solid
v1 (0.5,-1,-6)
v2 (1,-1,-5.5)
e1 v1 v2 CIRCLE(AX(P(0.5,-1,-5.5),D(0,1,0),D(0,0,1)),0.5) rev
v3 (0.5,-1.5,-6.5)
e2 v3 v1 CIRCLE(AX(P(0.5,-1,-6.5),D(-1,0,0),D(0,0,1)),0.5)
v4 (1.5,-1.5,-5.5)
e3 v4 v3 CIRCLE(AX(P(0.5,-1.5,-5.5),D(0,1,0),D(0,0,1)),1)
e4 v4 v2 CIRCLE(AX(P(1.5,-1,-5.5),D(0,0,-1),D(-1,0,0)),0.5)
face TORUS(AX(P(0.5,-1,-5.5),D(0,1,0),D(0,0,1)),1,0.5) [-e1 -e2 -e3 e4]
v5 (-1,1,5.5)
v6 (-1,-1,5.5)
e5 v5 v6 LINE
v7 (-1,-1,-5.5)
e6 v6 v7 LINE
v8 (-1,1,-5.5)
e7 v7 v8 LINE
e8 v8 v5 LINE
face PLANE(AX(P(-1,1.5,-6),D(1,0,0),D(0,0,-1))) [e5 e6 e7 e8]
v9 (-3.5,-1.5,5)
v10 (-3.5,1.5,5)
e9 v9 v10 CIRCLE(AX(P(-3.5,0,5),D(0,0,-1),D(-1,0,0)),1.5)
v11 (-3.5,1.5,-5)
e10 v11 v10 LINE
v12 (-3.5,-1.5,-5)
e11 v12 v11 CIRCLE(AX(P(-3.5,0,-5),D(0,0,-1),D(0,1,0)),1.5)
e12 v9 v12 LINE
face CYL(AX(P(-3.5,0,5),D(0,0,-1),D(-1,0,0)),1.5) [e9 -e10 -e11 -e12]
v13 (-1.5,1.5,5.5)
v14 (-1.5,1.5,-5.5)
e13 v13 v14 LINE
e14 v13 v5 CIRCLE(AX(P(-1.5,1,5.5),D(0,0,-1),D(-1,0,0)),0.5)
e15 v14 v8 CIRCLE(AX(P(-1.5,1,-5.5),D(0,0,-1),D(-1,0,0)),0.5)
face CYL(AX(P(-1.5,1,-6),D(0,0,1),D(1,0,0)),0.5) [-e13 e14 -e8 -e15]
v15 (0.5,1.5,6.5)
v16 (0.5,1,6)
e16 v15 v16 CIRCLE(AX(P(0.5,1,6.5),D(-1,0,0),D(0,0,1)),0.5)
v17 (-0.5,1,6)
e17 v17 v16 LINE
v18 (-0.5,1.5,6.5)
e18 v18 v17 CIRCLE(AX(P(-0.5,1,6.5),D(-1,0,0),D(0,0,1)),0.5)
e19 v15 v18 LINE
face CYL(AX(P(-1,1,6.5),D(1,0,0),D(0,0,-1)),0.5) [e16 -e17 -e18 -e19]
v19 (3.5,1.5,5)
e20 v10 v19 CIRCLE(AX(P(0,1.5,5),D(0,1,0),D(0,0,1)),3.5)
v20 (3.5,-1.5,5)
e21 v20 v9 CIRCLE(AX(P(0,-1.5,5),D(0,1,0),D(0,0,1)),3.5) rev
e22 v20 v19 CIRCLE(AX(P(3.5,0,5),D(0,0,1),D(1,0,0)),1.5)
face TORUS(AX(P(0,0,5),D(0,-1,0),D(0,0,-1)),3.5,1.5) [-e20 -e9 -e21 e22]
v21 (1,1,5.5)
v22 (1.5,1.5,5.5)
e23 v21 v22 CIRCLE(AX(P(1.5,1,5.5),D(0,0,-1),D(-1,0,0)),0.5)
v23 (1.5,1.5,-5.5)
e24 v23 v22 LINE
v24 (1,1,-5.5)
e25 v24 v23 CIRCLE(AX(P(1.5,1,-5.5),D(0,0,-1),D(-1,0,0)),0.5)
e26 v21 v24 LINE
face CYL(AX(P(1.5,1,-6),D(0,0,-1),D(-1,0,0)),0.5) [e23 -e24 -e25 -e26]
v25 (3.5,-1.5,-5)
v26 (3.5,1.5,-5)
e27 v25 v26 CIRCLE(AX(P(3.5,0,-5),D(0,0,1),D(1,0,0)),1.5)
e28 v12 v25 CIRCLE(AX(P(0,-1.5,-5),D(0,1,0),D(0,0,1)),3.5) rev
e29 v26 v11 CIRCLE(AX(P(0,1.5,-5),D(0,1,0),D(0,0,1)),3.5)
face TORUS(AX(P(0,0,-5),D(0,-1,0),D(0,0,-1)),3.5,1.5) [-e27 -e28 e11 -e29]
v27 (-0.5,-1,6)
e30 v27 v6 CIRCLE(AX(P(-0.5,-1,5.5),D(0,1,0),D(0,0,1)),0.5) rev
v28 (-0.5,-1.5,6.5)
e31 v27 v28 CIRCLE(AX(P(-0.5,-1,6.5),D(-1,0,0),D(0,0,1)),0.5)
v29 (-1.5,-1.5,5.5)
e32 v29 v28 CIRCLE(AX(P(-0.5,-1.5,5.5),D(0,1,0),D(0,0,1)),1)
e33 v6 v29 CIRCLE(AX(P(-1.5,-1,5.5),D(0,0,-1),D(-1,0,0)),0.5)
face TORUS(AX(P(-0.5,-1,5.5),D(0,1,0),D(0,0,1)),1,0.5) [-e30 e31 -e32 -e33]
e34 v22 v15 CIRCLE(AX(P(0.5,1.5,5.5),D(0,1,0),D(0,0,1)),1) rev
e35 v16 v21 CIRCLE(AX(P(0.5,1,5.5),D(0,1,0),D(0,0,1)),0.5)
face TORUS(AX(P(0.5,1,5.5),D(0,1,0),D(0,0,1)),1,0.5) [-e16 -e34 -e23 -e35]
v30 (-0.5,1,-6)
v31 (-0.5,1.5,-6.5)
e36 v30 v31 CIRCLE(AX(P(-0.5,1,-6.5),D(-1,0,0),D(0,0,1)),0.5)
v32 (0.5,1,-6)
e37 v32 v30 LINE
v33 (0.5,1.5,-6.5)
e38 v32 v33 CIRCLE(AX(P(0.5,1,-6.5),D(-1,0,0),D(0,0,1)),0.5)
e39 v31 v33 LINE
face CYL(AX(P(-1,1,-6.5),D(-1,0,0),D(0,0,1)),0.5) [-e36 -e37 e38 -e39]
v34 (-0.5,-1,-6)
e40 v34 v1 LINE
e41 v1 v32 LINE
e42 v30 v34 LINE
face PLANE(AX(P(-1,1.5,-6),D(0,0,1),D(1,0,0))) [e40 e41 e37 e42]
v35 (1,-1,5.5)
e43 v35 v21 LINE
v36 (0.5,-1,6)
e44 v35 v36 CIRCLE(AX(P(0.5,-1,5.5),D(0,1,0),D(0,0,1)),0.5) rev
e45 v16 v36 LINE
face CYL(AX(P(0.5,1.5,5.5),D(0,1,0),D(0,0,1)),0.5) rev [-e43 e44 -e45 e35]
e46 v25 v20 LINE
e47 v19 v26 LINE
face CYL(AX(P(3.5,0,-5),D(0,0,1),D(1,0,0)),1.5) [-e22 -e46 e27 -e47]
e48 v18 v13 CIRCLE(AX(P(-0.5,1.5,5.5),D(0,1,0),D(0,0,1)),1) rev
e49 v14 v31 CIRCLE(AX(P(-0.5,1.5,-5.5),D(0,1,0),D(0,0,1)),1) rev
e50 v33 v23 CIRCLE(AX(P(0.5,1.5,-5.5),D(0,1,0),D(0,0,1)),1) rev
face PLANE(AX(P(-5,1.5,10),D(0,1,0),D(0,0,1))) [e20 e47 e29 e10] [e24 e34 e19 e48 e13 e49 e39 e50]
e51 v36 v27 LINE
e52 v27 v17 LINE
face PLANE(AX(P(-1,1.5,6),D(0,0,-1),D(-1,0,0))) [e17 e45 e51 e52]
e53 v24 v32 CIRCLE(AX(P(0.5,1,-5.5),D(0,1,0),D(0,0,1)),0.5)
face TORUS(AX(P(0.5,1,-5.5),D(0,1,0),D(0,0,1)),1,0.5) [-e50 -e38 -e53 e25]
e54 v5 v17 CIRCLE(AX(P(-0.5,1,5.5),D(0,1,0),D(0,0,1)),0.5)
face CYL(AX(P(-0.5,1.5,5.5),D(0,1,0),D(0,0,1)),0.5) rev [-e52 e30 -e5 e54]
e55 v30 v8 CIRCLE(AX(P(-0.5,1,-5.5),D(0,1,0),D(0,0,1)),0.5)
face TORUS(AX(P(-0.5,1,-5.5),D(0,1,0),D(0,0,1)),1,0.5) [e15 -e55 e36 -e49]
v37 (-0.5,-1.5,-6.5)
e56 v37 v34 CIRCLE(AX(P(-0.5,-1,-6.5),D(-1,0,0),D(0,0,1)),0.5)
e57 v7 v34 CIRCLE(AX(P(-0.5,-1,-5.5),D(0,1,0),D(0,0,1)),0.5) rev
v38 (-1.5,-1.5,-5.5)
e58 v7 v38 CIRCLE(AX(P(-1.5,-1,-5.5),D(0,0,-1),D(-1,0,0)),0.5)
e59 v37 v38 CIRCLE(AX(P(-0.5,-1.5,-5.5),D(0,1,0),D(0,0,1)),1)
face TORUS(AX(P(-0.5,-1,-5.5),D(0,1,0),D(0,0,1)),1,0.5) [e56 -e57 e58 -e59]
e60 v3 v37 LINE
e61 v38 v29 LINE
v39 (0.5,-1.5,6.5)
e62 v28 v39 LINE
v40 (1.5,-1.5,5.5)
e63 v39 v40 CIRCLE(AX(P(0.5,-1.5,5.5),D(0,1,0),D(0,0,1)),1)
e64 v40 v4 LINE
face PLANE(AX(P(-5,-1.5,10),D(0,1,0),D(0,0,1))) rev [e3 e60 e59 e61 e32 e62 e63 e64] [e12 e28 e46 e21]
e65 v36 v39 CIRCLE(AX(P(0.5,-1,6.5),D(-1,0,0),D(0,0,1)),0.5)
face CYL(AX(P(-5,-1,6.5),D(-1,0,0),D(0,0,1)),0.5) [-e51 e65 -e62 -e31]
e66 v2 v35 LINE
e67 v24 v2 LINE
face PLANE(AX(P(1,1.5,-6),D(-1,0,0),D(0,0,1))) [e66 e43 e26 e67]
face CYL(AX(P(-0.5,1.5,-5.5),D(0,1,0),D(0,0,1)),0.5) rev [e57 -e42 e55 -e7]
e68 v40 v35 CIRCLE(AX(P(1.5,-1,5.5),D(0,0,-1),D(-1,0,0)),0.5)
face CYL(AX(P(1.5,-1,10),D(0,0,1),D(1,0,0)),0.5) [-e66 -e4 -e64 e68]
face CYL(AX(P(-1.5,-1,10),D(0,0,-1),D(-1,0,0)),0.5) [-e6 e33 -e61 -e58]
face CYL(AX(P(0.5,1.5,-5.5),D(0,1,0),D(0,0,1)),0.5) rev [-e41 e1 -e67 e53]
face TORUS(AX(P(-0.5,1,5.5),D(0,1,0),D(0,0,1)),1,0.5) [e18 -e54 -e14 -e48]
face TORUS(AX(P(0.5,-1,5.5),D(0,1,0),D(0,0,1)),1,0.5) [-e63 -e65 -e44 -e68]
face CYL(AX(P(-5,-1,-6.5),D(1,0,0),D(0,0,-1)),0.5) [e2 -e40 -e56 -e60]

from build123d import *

# Parameters (mm, degrees)
SKETCH1_W      = 10
SKETCH1_H      = 20
SKETCH1_W_2    = 2
SKETCH1_H_2    = 12
EXTRUDE1_DEPTH = 1.5
FILLET1_RADIUS = 5
FILLET1_LENGTH = 3
FILLET5_RADIUS = 5
FILLET5_LENGTH = 3
FILLET3_R      = 0.5
FILLET4_R      = 0.5
FILLET6_R      = 1.5


with BuildPart() as part:
    # Sketch1 → Extrude1 (new, symmetric)
    with BuildSketch(Plane(origin=(0, 0, 0), x_dir=(1, 0, 0), z_dir=(0, 1, 0))):
        Rectangle(SKETCH1_W, SKETCH1_H)
        Rectangle(SKETCH1_W_2, SKETCH1_H_2, mode=Mode.SUBTRACT)
    extrude(amount=EXTRUDE1_DEPTH, both=True)

    # Fillet1: full round fillet: the end face becomes a half cylinder, R = half its width
    fillet1_face = Plane((0, 0, 10), x_dir=(0, 1, 0), z_dir=(0, 0, 1))  # on the end face: x along it, z out of the body
    fillet1_slab = fillet1_face.offset(-FILLET1_RADIUS / 2) * Box(FILLET1_LENGTH, 2 * FILLET1_RADIUS, FILLET1_RADIUS, mode=Mode.PRIVATE)  # the body's end, R deep
    fillet1_round = Plane((0, 0, 5), x_dir=(0, 0, 1), z_dir=(0, 1, 0)) * Cylinder(FILLET1_RADIUS, FILLET1_LENGTH, mode=Mode.PRIVATE)  # its axis R under the face
    add(fillet1_slab - fillet1_round, mode=Mode.SUBTRACT)

    # Fillet5: full round fillet: the end face becomes a half cylinder, R = half its width
    fillet5_face = Plane((0, 0, -10), x_dir=(0, 1, 0), z_dir=(0, 0, -1))  # on the end face: x along it, z out of the body
    fillet5_slab = fillet5_face.offset(-FILLET5_RADIUS / 2) * Box(FILLET5_LENGTH, 2 * FILLET5_RADIUS, FILLET5_RADIUS, mode=Mode.PRIVATE)  # the body's end, R deep
    fillet5_round = Plane((0, 0, -5), x_dir=(0, 0, -1), z_dir=(0, 1, 0)) * Cylinder(FILLET5_RADIUS, FILLET5_LENGTH, mode=Mode.PRIVATE)  # its axis R under the face
    add(fillet5_slab - fillet5_round, mode=Mode.SUBTRACT)

    # Fillet3
    fillet3_edges = [part.edges().sort_by_distance(p)[0] for p in [
        (-1, 0, -6),
        (-1, 0, 6),
        (1, 0, 6),
        (1, 0, -6),
    ]]
    fillet(fillet3_edges, radius=FILLET3_R)

    # Fillet4
    fillet4_edges = [part.edges().sort_by_distance(p)[0] for p in [
        (1, -1.5, 0),
        (1, 1.5, 0),
        (0, -1.5, -6),
        (0, 1.5, -6),
        (-1, -1.5, 0),
        (-1, 1.5, 0),
        (0, -1.5, 6),
        (0, 1.5, 6),
        (0.853553391, -1.5, -5.853553391),
        (0.853553391, 1.5, -5.853553391),
        (-0.853553391, -1.5, -5.853553391),
        (-0.853553391, 1.5, -5.853553391),
        (0.853553391, -1.5, 5.853553391),
        (0.853553391, 1.5, 5.853553391),
        (-0.853553391, -1.5, 5.853553391),
        (-0.853553391, 1.5, 5.853553391),
    ]]
    fillet(fillet4_edges, radius=FILLET4_R)

    # Fillet6
    fillet6_edges = [part.edges().sort_by_distance(p)[0] for p in [
        (5, -1.5, 0),
        (5, 1.5, 0),
        (0, 1.5, 10),
        (-5, -1.5, 0),
        (-5, 1.5, 0),
        (0, -1.5, -10),
    ]]
    fillet(fillet6_edges, radius=FILLET6_R - 0.0001)  # a hair under: the kernel refuses the full size


solid = part.part
